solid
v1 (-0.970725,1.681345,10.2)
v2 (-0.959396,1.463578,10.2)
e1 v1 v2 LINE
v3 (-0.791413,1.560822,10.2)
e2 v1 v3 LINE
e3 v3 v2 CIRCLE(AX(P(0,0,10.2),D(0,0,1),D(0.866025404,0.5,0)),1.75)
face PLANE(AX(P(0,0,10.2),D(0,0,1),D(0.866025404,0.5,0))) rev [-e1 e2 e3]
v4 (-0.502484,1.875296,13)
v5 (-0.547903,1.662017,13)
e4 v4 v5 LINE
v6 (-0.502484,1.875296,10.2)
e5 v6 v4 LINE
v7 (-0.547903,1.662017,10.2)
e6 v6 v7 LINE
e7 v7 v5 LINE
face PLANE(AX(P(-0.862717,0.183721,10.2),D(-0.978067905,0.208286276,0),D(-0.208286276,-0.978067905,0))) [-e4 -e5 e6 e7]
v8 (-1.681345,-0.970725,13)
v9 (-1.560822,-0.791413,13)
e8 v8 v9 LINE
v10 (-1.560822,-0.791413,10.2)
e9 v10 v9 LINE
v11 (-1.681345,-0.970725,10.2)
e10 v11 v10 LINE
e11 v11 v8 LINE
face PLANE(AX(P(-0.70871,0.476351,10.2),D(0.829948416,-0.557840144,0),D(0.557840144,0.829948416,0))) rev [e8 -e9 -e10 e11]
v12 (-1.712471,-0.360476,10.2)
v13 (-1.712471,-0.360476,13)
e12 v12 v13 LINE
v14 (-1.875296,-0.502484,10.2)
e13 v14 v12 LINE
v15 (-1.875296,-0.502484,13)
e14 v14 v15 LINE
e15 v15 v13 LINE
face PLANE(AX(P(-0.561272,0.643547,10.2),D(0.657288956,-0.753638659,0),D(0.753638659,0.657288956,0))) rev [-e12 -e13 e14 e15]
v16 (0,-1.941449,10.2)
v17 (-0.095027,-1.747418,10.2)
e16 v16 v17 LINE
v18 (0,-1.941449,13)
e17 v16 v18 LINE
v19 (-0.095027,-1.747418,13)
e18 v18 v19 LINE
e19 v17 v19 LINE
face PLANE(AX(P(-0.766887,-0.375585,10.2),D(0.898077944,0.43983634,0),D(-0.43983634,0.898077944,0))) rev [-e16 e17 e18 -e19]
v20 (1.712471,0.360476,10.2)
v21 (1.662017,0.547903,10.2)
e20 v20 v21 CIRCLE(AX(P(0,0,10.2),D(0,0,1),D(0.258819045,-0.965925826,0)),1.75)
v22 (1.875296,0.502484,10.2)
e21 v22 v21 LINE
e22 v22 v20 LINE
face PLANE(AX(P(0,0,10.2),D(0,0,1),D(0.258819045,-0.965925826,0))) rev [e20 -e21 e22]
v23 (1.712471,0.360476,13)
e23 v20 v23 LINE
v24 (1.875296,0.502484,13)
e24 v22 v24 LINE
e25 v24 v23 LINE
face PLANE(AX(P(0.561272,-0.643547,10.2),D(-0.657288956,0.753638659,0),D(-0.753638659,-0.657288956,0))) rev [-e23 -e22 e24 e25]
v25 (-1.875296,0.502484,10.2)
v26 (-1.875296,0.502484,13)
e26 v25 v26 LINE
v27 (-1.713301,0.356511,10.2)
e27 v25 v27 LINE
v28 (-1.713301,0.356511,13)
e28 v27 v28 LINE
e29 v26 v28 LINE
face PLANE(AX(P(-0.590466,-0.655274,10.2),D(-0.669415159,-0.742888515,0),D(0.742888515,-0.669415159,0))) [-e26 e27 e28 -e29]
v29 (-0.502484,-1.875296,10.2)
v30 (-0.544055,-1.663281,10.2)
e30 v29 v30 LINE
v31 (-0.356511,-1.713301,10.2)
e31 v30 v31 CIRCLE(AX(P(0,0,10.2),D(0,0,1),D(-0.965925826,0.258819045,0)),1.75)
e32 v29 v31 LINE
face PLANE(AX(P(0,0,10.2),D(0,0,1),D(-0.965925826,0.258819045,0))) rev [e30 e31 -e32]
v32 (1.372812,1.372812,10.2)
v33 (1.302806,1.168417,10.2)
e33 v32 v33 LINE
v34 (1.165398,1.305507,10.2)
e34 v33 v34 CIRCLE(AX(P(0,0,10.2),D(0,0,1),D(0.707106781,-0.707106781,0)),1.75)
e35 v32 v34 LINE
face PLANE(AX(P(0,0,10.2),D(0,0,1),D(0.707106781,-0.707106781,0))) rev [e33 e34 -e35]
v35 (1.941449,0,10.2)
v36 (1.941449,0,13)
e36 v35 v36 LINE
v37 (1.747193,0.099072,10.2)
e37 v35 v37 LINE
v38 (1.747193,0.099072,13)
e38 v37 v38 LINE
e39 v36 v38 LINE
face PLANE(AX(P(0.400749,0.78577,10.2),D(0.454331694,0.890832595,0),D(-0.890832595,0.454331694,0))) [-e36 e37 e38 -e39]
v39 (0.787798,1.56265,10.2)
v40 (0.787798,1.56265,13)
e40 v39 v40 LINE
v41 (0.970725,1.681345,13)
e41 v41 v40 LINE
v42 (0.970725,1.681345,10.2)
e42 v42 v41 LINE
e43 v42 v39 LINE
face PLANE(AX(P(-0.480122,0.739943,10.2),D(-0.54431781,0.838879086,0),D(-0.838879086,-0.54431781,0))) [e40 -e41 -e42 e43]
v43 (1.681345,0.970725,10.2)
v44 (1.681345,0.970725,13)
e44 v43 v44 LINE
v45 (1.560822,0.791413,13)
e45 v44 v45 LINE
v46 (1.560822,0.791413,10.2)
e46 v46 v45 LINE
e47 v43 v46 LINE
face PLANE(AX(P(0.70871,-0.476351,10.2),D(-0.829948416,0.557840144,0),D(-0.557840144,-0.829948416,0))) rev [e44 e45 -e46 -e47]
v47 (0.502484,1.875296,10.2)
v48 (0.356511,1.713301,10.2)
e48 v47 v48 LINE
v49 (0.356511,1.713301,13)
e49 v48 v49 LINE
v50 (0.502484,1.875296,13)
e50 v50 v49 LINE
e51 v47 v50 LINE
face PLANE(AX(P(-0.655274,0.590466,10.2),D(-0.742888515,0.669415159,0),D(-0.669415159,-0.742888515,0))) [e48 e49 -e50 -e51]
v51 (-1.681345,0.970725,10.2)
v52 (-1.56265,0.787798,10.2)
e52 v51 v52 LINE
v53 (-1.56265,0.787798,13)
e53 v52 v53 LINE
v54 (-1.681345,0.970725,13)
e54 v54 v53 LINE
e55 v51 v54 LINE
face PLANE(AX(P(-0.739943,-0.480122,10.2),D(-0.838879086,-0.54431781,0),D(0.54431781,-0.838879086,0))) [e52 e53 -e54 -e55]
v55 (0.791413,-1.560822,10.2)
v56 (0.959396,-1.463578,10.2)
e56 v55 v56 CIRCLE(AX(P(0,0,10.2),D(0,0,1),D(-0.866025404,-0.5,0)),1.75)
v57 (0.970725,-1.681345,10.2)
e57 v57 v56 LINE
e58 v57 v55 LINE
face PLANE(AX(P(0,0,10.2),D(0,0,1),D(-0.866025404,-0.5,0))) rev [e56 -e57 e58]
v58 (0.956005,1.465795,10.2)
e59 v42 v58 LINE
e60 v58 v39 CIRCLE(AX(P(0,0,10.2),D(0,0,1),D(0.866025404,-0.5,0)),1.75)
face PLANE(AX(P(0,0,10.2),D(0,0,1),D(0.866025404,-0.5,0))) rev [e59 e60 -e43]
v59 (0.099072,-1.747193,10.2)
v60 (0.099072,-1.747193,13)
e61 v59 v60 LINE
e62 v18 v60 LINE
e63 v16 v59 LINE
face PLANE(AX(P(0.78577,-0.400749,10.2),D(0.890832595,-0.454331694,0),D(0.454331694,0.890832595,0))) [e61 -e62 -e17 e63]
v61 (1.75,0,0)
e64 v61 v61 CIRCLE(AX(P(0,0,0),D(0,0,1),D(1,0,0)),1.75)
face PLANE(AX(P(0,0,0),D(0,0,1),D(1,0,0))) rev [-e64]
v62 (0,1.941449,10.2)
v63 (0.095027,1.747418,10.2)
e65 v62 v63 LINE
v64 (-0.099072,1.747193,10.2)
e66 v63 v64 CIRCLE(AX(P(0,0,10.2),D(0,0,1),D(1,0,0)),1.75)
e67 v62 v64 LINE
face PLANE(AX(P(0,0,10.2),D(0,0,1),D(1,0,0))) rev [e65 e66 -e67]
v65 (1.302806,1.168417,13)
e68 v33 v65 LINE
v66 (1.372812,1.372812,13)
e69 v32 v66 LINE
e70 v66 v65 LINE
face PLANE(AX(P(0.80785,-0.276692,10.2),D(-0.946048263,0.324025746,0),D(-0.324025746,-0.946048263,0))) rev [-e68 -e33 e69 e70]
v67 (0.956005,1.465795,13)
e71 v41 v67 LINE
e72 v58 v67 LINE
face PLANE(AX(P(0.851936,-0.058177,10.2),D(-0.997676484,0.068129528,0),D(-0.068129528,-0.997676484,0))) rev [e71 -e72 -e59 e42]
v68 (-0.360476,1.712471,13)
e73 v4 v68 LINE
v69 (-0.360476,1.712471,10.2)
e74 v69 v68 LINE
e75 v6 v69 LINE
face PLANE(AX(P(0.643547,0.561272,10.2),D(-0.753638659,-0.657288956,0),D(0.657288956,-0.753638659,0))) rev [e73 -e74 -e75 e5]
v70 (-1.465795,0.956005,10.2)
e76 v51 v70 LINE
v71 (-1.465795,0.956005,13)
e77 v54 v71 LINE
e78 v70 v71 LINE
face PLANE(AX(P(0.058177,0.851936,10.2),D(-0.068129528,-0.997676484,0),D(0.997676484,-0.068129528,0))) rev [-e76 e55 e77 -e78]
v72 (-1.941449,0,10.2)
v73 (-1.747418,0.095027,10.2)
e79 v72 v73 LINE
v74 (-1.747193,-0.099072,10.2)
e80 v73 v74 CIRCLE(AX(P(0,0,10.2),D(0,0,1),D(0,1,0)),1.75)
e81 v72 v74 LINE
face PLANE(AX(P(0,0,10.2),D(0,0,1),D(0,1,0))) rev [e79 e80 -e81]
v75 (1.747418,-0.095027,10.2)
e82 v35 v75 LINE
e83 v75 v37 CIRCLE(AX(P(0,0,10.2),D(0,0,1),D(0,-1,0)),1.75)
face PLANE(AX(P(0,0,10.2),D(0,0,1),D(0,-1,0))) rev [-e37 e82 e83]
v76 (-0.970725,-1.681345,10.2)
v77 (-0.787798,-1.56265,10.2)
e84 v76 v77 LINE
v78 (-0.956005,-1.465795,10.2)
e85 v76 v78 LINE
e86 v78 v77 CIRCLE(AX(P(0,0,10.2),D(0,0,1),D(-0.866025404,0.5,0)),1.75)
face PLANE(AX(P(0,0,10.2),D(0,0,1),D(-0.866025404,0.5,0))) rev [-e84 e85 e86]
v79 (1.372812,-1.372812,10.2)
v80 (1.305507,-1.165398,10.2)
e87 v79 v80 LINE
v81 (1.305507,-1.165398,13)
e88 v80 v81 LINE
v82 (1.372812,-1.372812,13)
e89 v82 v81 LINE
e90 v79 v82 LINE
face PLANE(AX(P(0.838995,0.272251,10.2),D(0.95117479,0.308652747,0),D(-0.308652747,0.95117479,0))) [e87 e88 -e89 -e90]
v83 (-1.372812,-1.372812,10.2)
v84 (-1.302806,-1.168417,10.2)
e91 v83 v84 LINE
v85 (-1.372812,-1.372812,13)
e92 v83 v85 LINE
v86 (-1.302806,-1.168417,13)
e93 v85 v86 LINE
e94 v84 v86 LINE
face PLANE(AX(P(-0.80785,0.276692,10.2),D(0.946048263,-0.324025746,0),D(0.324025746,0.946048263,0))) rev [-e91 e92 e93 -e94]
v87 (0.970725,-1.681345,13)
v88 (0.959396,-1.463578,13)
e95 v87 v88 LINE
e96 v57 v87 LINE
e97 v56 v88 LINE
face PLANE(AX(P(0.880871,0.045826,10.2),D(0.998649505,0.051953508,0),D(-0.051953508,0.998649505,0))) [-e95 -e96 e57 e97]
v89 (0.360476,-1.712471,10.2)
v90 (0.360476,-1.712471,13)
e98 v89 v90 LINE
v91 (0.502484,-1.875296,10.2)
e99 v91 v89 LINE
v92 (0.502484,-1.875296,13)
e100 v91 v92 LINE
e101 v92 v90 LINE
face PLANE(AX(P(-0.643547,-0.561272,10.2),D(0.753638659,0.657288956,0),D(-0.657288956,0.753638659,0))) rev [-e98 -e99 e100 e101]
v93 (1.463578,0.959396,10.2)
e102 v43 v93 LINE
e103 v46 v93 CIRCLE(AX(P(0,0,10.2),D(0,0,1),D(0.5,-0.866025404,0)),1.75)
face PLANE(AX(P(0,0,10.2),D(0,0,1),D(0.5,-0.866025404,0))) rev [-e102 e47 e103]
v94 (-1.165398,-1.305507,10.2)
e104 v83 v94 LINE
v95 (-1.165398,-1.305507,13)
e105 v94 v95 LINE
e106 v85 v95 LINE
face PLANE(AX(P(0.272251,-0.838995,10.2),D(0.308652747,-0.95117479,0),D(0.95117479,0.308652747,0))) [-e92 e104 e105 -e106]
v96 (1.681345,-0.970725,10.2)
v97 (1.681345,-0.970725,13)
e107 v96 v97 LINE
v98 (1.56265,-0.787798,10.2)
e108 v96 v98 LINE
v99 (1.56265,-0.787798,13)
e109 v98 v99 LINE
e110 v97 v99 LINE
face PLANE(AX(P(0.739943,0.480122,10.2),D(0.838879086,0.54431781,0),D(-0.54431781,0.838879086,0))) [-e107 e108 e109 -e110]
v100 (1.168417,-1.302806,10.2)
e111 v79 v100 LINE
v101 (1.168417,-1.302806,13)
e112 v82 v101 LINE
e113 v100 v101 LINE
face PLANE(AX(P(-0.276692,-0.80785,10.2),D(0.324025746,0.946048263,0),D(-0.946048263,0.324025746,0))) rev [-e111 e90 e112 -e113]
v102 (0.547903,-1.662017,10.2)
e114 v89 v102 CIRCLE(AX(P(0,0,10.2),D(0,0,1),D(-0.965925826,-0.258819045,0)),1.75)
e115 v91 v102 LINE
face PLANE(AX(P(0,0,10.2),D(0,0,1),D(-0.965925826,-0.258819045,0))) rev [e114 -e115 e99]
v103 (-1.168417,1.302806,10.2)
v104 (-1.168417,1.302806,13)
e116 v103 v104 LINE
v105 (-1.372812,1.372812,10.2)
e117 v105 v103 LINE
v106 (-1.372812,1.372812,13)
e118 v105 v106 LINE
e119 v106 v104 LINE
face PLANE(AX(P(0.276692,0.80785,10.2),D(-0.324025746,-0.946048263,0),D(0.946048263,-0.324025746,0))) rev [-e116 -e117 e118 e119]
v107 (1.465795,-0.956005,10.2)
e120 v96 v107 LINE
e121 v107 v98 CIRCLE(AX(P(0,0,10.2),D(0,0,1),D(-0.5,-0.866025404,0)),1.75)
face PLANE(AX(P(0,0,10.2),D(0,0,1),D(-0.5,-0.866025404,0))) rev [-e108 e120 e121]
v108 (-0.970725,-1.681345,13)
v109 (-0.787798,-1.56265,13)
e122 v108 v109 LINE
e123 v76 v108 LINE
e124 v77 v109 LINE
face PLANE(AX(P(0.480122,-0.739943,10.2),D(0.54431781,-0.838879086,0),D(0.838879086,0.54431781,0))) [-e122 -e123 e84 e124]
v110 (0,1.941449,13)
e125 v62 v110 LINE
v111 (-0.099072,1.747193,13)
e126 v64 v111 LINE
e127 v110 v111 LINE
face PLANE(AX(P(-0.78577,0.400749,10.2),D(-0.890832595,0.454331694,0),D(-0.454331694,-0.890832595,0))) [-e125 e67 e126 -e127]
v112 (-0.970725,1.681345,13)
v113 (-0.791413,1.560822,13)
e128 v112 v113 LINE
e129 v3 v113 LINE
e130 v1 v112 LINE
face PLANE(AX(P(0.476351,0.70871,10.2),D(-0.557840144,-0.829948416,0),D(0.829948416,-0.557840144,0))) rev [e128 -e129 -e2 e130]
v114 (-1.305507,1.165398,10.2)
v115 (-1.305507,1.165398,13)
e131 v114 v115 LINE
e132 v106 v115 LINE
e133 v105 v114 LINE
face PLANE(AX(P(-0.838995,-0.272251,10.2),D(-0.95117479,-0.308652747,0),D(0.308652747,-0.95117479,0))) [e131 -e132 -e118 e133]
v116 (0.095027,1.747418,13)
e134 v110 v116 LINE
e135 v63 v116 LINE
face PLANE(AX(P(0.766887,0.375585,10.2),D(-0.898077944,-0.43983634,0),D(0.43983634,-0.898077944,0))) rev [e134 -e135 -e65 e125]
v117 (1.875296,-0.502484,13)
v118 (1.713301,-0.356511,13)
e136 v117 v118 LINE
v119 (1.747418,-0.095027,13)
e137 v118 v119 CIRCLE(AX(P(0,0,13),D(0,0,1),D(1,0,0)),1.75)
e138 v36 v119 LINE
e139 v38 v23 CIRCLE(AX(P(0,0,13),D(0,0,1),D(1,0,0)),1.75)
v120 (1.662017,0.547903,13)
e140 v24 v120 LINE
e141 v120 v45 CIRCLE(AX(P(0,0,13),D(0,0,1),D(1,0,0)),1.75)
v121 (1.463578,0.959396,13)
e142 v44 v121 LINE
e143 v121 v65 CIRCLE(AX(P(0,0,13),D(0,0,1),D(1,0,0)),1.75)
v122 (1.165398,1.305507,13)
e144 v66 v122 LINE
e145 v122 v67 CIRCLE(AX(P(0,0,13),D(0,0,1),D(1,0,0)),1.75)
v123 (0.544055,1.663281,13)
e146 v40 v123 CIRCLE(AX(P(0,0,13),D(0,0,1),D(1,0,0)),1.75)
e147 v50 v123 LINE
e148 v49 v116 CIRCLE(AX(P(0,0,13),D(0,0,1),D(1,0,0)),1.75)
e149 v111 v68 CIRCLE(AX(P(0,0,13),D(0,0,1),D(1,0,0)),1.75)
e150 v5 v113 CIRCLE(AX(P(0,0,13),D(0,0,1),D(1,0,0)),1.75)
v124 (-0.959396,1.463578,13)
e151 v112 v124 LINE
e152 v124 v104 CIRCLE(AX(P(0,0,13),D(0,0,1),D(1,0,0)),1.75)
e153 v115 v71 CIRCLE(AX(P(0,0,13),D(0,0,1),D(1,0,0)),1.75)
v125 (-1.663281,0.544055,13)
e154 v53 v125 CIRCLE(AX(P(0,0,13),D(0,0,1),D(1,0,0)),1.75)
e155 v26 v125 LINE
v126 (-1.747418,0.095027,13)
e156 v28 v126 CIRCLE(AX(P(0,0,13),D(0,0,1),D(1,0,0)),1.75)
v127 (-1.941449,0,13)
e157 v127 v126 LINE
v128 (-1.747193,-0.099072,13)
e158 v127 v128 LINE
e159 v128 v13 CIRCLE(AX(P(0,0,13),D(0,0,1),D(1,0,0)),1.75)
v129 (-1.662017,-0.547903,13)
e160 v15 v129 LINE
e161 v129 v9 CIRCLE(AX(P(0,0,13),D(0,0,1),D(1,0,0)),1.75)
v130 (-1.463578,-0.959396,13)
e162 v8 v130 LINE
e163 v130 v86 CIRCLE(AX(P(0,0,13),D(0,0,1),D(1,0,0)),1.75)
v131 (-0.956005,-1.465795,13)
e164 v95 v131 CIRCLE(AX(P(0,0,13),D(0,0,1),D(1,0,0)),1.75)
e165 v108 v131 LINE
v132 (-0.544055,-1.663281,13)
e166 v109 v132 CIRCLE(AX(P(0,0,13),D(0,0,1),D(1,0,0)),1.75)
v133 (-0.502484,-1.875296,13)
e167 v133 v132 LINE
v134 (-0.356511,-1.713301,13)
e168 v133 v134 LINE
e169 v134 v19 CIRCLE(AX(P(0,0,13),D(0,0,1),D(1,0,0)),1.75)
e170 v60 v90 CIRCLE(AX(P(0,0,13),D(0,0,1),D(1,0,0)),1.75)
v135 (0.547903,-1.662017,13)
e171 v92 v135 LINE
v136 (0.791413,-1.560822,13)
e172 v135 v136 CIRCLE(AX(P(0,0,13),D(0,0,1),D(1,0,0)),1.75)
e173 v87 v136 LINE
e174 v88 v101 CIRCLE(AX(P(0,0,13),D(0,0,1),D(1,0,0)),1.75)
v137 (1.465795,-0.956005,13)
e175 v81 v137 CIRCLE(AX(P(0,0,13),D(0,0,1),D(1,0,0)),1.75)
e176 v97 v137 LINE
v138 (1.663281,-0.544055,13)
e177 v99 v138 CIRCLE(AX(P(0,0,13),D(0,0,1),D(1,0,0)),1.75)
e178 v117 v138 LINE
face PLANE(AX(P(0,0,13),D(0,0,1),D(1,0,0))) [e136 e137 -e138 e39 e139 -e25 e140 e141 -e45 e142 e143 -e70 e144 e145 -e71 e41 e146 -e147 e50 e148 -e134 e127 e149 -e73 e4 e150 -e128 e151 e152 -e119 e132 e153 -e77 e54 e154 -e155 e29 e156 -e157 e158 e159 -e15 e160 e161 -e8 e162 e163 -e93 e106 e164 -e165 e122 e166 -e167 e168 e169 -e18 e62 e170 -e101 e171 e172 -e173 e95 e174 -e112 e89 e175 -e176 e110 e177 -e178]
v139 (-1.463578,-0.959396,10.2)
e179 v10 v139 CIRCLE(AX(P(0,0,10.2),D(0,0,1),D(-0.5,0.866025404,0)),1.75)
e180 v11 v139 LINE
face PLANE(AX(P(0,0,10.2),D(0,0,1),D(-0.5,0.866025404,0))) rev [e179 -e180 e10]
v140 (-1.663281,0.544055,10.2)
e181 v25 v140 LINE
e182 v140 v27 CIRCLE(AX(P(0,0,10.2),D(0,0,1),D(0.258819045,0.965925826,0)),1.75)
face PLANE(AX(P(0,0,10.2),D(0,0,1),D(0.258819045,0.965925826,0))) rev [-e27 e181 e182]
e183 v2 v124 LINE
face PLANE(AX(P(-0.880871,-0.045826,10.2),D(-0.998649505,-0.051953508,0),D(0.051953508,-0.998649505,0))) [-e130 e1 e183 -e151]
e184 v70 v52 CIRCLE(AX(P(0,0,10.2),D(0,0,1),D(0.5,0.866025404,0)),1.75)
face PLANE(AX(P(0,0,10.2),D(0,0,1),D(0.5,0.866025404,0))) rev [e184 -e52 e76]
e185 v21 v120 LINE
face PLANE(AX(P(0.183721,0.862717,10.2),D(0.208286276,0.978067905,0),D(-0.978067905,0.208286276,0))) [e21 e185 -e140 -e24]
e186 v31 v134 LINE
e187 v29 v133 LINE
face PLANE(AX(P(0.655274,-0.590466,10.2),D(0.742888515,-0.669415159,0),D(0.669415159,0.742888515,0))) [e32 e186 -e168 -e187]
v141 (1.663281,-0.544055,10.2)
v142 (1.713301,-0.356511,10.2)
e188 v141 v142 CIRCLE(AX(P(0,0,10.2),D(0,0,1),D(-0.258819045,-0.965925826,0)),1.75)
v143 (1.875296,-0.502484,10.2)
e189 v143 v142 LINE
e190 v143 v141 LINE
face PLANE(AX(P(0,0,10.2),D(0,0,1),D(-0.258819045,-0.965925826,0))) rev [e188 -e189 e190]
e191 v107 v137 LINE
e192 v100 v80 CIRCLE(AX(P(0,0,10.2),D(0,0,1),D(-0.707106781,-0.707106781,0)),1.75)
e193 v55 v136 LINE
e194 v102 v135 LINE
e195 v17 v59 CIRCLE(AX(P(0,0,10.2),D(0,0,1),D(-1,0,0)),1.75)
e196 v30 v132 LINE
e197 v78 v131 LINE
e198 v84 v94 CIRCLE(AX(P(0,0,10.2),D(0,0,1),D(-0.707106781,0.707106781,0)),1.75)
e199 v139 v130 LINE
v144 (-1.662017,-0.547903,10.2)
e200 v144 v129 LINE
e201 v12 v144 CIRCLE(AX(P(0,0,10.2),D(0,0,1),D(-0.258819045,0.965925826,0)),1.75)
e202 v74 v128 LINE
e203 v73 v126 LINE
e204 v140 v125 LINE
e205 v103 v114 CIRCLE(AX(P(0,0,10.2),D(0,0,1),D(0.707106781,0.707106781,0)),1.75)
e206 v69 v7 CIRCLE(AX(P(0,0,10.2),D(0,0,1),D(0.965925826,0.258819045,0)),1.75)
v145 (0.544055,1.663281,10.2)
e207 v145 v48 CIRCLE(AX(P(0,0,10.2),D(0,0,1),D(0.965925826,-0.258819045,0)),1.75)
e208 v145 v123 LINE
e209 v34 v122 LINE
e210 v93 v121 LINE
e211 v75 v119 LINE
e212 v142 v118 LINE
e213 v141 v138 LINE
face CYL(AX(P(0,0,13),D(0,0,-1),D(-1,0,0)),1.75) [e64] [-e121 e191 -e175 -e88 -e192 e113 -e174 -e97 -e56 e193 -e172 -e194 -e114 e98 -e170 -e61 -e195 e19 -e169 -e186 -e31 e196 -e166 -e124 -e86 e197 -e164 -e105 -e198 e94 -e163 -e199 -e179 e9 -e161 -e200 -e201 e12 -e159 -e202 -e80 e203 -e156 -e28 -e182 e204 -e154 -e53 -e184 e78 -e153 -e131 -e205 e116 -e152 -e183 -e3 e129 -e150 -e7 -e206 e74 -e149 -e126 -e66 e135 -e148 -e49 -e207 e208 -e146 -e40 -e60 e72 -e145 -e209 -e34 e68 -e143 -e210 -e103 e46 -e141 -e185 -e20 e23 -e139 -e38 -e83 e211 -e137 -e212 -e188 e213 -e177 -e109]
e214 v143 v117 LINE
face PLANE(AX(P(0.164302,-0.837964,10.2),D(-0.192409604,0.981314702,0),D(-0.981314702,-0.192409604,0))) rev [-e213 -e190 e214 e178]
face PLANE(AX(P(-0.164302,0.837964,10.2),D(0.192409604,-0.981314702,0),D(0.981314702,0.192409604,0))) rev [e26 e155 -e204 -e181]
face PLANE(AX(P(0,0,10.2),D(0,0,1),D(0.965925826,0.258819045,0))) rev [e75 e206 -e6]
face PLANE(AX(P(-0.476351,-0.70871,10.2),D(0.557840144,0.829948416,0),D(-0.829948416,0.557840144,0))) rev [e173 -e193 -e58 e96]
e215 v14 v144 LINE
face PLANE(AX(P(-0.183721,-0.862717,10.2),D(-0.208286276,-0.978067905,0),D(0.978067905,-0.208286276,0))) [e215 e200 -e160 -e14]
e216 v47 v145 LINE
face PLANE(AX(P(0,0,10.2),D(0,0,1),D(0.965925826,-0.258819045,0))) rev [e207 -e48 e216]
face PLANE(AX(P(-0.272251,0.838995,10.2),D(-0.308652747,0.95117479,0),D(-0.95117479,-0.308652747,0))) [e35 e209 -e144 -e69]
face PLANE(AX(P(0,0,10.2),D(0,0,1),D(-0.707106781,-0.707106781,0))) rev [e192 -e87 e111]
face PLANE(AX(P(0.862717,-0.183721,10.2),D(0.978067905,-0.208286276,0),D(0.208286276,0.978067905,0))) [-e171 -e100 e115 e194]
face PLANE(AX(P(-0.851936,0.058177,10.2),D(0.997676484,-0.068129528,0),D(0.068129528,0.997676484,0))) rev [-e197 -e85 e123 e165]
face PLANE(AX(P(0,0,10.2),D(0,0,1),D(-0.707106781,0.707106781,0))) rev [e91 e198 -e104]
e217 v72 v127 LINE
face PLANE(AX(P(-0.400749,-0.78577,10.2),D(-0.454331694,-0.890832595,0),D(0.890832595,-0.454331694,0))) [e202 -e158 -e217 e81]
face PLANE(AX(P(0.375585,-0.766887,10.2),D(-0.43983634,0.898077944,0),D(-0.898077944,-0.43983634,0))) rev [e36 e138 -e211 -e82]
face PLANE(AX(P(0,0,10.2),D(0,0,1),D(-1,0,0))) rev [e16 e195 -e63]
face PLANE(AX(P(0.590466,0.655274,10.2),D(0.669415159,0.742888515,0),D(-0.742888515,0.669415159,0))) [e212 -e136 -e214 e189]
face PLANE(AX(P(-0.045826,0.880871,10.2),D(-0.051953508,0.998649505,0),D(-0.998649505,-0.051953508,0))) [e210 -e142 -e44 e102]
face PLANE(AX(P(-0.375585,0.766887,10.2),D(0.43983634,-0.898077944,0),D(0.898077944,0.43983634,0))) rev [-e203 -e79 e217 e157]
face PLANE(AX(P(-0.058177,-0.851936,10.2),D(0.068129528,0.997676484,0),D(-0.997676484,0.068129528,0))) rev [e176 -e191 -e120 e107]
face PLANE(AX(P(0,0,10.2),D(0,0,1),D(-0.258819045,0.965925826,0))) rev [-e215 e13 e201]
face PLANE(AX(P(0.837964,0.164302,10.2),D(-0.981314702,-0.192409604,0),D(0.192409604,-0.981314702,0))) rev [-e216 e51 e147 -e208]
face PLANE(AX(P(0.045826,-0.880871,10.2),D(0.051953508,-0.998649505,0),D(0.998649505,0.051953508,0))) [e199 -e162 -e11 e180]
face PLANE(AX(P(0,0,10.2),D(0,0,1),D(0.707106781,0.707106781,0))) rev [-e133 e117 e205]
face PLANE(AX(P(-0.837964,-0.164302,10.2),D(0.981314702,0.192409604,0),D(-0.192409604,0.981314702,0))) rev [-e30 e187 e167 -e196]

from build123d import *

# Parameters (mm, degrees)
SKETCH1_R           = 1.75
BOSS_EXTRUDE1_DEPTH = 13
BOSS_EXTRUDE2_START = -2.8
BOSS_EXTRUDE2_DEPTH = 2.8
CIRPATTERN1_START   = 10.2
CIRPATTERN1_DEPTH   = 2.8


# Read off the part's stored shape, not the designer's step: CirPattern1
with BuildPart() as part:
    # Sketch1 → Boss-Extrude1 (new body)
    with BuildSketch(Plane.XY):
        with Locations(Location((0, 0, 0), (0, 0, 180))):
            Circle(SKETCH1_R)
    extrude(amount=BOSS_EXTRUDE1_DEPTH)

    # Sketch2 → Boss-Extrude2 (add)
    with BuildSketch(Plane.XY.offset(13).offset(BOSS_EXTRUDE2_START)):
        with BuildLine():
            Line((0.095027487, 1.747418031), (0, 1.941449497))
            Line((0, 1.941449497), (-0.099072162, 1.74719338))
            ThreePointArc((-0.099072162, 1.74719338), (-0.002025455, 1.749998828), (0.095027487, 1.747418031))
        make_face()
    extrude(amount=BOSS_EXTRUDE2_DEPTH)

    # CirPattern1 outline → CirPattern1 (add)
    with BuildSketch(Plane.XY.offset(CIRPATTERN1_START)):
        with BuildLine():
            Line((-0.360475563, 1.712471129), (-0.502484105, 1.87529621))
            Line((-0.502484105, 1.87529621), (-0.547903282, 1.662017447))
            ThreePointArc((-0.547903282, 1.662017447), (-0.454889465, 1.689844838), (-0.360475563, 1.712471129))
        make_face()
        with BuildLine():
            Line((0.502484105, 1.87529621), (0.356510562, 1.713300972))
            ThreePointArc((0.356510562, 1.713300972), (0.450976586, 1.69089329), (0.54405457, 1.663281283))
            Line((0.54405457, 1.663281283), (0.502484105, 1.87529621))
        make_face()
        with BuildLine():
            ThreePointArc((-0.959395699, 1.463577771), (-0.876753509, 1.514530714), (-0.791412798, 1.56082215))
            Line((-0.791412798, 1.56082215), (-0.970724749, 1.681344585))
            Line((-0.970724749, 1.681344585), (-0.959395699, 1.463577771))
        make_face()
        with BuildLine():
            Line((0.970724749, 1.681344585), (0.787797681, 1.562649933))
            ThreePointArc((0.787797681, 1.562649933), (0.873245319, 1.516556169), (0.956005233, 1.465794663))
            Line((0.956005233, 1.465794663), (0.970724749, 1.681344585))
        make_face()
        with BuildLine():
            ThreePointArc((-1.305506884, 1.165397689), (-1.238868251, 1.236003826), (-1.168416559, 1.30280572))
            Line((-1.168416559, 1.30280572), (-1.372812105, 1.372812105))
            Line((-1.372812105, 1.372812105), (-1.305506884, 1.165397689))
        make_face()
        with BuildLine():
            Line((1.372812105, 1.372812105), (1.165397689, 1.305506884))
            ThreePointArc((1.165397689, 1.305506884), (1.236003826, 1.238868251), (1.30280572, 1.168416559))
            Line((1.30280572, 1.168416559), (1.372812105, 1.372812105))
        make_face()
        with BuildLine():
            ThreePointArc((-1.562649933, 0.787797681), (-1.516556169, 0.873245319), (-1.465794663, 0.956005233))
            Line((-1.465794663, 0.956005233), (-1.681344585, 0.970724749))
            Line((-1.681344585, 0.970724749), (-1.562649933, 0.787797681))
        make_face()
        with BuildLine():
            Line((1.681344585, 0.970724749), (1.463577771, 0.959395699))
            ThreePointArc((1.463577771, 0.959395699), (1.514530714, 0.876753509), (1.56082215, 0.791412798))
            Line((1.56082215, 0.791412798), (1.681344585, 0.970724749))
        make_face()
        with BuildLine():
            ThreePointArc((-1.713300972, 0.356510562), (-1.69089329, 0.450976586), (-1.663281283, 0.54405457))
            Line((-1.663281283, 0.54405457), (-1.87529621, 0.502484105))
            Line((-1.87529621, 0.502484105), (-1.713300972, 0.356510562))
        make_face()
        with BuildLine():
            Line((1.87529621, 0.502484105), (1.662017447, 0.547903282))
            ThreePointArc((1.662017447, 0.547903282), (1.689844838, 0.454889465), (1.712471129, 0.360475563))
            Line((1.712471129, 0.360475563), (1.87529621, 0.502484105))
        make_face()
        with BuildLine():
            ThreePointArc((-1.74719338, -0.099072162), (-1.749998828, -0.002025455), (-1.747418031, 0.095027487))
            Line((-1.747418031, 0.095027487), (-1.941449497, 0))
            Line((-1.941449497, 0), (-1.74719338, -0.099072162))
        make_face()
        with BuildLine():
            Line((1.941449497, 0), (1.74719338, 0.099072162))
            ThreePointArc((1.74719338, 0.099072162), (1.749998828, 0.002025455), (1.747418031, -0.095027487))
            Line((1.747418031, -0.095027487), (1.941449497, 0))
        make_face()
        with BuildLine():
            ThreePointArc((-1.662017447, -0.547903282), (-1.689844838, -0.454889465), (-1.712471129, -0.360475563))
            Line((-1.712471129, -0.360475563), (-1.87529621, -0.502484105))
            Line((-1.87529621, -0.502484105), (-1.662017447, -0.547903282))
        make_face()
        with BuildLine():
            ThreePointArc((-1.463577771, -0.959395699), (-1.514530714, -0.876753509), (-1.56082215, -0.791412798))
            Line((-1.56082215, -0.791412798), (-1.681344585, -0.970724749))
            Line((-1.681344585, -0.970724749), (-1.463577771, -0.959395699))
        make_face()
        with BuildLine():
            Line((1.87529621, -0.502484105), (1.713300972, -0.356510562))
            ThreePointArc((1.713300972, -0.356510562), (1.69089329, -0.450976586), (1.663281283, -0.54405457))
            Line((1.663281283, -0.54405457), (1.87529621, -0.502484105))
        make_face()
        with BuildLine():
            ThreePointArc((-1.165397689, -1.305506884), (-1.236003826, -1.238868251), (-1.30280572, -1.168416559))
            Line((-1.30280572, -1.168416559), (-1.372812105, -1.372812105))
            Line((-1.372812105, -1.372812105), (-1.165397689, -1.305506884))
        make_face()
        with BuildLine():
            Line((1.681344585, -0.970724749), (1.562649933, -0.787797681))
            ThreePointArc((1.562649933, -0.787797681), (1.516556169, -0.873245319), (1.465794663, -0.956005233))
            Line((1.465794663, -0.956005233), (1.681344585, -0.970724749))
        make_face()
        with BuildLine():
            ThreePointArc((-0.787797681, -1.562649933), (-0.873245319, -1.516556169), (-0.956005233, -1.465794663))
            Line((-0.956005233, -1.465794663), (-0.970724749, -1.681344585))
            Line((-0.970724749, -1.681344585), (-0.787797681, -1.562649933))
        make_face()
        with BuildLine():
            Line((1.372812105, -1.372812105), (1.305506884, -1.165397689))
            ThreePointArc((1.305506884, -1.165397689), (1.238868251, -1.236003826), (1.168416559, -1.30280572))
            Line((1.168416559, -1.30280572), (1.372812105, -1.372812105))
        make_face()
        with BuildLine():
            ThreePointArc((-0.356510562, -1.713300972), (-0.450976586, -1.69089329), (-0.54405457, -1.663281283))
            Line((-0.54405457, -1.663281283), (-0.502484105, -1.87529621))
            Line((-0.502484105, -1.87529621), (-0.356510562, -1.713300972))
        make_face()
        with BuildLine():
            Line((0.970724749, -1.681344585), (0.959395699, -1.463577771))
            ThreePointArc((0.959395699, -1.463577771), (0.876753509, -1.514530714), (0.791412798, -1.56082215))
            Line((0.791412798, -1.56082215), (0.970724749, -1.681344585))
        make_face()
        with BuildLine():
            ThreePointArc((0.099072162, -1.74719338), (0.002025455, -1.749998828), (-0.095027487, -1.747418031))
            Line((-0.095027487, -1.747418031), (0, -1.941449497))
            Line((0, -1.941449497), (0.099072162, -1.74719338))
        make_face()
        with BuildLine():
            Line((0.502484105, -1.87529621), (0.547903282, -1.662017447))
            ThreePointArc((0.547903282, -1.662017447), (0.454889465, -1.689844838), (0.360475563, -1.712471129))
            Line((0.360475563, -1.712471129), (0.502484105, -1.87529621))
        make_face()
    extrude(amount=CIRPATTERN1_DEPTH)


solid = part.part
